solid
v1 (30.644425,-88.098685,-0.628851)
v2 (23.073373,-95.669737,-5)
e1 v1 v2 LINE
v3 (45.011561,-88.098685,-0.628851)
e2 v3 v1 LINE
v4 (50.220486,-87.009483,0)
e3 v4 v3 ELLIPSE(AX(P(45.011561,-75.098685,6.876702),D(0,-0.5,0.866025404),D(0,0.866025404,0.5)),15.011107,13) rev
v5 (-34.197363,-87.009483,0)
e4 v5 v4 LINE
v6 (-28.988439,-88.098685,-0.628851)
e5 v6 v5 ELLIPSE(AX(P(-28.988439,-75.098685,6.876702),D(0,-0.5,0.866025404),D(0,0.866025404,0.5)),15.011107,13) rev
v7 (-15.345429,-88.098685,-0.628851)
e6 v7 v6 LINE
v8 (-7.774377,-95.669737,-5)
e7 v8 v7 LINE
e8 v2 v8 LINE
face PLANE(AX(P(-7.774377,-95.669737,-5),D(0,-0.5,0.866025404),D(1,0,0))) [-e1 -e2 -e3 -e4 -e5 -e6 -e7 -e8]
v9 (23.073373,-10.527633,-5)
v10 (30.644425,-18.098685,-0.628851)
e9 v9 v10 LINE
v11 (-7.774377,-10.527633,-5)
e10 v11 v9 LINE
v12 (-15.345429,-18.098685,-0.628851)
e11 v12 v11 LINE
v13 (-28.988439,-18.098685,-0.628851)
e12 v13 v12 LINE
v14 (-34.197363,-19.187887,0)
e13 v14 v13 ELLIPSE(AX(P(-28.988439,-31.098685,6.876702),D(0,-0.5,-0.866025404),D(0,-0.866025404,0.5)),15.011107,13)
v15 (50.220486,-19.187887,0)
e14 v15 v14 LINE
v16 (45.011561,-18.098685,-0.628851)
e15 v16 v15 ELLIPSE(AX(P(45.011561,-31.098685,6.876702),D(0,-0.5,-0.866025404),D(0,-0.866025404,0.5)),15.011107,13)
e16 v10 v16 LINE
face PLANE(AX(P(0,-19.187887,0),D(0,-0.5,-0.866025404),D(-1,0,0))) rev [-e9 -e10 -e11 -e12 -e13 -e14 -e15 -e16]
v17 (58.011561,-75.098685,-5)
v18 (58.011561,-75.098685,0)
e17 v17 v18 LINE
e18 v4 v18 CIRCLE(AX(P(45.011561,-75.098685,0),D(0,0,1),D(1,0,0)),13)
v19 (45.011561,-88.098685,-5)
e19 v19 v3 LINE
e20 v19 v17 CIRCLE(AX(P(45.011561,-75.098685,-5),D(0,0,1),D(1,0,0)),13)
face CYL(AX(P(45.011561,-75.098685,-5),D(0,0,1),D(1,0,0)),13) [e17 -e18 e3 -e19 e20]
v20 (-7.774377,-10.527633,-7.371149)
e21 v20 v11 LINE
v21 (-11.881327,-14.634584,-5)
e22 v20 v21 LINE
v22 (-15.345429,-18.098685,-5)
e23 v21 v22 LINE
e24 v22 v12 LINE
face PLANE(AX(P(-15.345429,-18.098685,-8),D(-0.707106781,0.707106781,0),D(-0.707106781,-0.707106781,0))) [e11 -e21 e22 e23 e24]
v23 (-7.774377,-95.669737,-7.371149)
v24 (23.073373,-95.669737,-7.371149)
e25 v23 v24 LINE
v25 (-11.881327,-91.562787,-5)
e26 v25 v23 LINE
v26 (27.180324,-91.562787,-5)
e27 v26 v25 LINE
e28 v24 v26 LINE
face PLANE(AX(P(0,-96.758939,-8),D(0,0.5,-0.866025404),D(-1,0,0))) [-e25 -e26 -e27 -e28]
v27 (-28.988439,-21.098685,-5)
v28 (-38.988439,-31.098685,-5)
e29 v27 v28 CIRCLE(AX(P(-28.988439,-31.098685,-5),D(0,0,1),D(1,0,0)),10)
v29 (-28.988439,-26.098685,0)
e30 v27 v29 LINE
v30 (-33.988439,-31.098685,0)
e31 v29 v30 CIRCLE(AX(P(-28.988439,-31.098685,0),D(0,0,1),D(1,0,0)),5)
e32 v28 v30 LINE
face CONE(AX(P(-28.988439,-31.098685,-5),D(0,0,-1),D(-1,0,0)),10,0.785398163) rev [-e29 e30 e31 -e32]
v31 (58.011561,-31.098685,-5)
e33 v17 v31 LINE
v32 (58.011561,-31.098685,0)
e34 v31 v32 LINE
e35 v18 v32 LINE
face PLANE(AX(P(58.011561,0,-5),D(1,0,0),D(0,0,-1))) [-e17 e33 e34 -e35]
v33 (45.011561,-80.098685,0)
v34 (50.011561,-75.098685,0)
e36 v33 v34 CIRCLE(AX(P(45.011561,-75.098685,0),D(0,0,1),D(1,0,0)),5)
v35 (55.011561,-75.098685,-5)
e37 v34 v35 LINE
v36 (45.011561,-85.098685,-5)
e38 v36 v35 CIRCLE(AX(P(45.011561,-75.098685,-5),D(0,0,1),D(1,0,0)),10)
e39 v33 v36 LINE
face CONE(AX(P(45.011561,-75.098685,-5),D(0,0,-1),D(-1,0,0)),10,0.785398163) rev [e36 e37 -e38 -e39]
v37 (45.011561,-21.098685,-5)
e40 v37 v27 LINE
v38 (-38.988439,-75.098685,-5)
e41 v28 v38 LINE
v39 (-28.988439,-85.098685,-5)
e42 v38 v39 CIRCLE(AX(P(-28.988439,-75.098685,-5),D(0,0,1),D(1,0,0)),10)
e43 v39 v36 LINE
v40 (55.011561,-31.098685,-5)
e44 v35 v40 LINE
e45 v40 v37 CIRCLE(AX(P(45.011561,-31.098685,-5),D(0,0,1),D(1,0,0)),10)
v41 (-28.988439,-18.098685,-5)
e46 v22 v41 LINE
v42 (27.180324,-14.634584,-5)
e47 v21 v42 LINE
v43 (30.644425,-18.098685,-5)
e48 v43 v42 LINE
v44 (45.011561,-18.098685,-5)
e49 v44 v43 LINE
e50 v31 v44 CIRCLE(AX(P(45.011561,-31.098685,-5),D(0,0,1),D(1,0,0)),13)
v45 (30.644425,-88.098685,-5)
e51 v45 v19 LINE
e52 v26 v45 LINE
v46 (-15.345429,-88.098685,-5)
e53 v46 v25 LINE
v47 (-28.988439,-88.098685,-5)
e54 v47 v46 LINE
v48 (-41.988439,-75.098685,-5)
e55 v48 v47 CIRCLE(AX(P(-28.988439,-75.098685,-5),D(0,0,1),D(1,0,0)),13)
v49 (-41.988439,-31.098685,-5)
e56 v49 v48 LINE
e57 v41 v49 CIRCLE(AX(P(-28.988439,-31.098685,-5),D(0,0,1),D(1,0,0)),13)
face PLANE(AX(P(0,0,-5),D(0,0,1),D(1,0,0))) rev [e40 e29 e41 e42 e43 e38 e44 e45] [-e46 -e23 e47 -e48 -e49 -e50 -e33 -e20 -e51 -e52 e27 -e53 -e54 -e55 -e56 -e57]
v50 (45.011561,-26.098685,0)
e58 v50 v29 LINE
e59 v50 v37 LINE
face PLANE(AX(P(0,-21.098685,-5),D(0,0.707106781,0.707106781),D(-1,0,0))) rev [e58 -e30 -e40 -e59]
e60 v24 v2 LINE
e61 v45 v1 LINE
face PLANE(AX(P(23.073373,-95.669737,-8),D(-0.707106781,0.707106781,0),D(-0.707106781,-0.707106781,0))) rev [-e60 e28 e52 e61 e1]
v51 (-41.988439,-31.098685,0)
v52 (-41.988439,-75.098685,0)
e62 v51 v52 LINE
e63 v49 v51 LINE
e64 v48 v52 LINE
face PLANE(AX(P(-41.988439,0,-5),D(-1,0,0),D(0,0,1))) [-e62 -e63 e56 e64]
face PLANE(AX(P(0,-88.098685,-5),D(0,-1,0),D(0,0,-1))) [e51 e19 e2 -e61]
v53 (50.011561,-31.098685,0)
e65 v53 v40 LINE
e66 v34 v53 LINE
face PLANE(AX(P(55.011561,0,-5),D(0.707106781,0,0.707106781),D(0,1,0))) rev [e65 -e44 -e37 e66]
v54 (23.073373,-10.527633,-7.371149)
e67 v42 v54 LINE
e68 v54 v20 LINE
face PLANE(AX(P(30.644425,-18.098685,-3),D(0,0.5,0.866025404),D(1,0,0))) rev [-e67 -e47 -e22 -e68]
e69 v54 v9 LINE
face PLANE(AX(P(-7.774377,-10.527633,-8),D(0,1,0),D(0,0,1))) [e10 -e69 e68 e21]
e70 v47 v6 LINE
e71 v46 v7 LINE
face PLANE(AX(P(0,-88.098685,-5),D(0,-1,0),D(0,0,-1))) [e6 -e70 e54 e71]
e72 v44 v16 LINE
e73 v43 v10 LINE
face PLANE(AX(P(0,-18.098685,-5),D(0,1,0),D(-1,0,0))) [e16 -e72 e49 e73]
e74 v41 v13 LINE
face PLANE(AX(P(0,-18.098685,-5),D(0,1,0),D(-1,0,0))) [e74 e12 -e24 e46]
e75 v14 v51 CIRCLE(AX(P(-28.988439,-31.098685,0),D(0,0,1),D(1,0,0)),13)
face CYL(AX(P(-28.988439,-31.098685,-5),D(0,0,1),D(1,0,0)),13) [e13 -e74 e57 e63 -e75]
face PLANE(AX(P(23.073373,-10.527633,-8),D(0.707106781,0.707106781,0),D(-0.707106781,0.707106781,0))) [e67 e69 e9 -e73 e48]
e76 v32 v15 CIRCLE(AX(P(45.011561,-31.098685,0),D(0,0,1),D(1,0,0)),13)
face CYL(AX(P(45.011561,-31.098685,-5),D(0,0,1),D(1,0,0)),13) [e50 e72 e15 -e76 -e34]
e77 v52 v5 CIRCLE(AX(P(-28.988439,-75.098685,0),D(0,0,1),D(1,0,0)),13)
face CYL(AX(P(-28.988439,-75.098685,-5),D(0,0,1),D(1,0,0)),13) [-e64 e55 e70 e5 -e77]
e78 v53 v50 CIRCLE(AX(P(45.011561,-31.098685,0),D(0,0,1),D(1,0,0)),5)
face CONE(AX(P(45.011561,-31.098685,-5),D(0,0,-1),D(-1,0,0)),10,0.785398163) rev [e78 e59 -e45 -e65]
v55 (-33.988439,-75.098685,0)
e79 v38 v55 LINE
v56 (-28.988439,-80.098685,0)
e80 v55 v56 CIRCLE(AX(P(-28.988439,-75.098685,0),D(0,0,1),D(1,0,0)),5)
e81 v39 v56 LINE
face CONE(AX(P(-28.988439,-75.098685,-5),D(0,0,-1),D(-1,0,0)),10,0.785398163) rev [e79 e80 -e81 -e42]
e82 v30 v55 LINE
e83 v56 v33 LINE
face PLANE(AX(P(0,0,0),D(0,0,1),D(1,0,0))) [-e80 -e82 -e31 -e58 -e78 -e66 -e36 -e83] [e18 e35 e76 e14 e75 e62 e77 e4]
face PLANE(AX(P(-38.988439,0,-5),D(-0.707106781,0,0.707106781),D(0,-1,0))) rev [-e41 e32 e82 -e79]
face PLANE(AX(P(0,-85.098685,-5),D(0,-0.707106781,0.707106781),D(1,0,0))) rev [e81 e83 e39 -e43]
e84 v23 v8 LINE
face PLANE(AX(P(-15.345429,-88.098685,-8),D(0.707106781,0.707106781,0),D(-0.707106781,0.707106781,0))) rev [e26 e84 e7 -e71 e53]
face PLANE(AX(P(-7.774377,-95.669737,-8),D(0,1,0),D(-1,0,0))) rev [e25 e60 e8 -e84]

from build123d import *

# Parameters (mm, degrees)
BOSS_EXTRUDE1_DEPTH       = 5
CHAMFER1_SIZE             = 5
BOSS_EXTRUDE2_DEPTH       = 8
CHAMFER2_SIZE2            = 5
CHAMFER2_SIZE             = 8.660254038
CHAMFER2_OF_MIRROR1_SIZE2 = 5
CHAMFER2_OF_MIRROR1_SIZE  = 8.660254038


# Some blends are built 0.0001 mm under size
with BuildPart() as part:
    # Sketch1 → Boss-Extrude1 (new body)
    # profile 1 of 2: a face of its own
    with BuildSketch(Plane.XY):
        with BuildLine():
            Line((-41.988438617, -31.098685124), (-41.988438617, -75.098685124))
            ThreePointArc((-41.988438617, -75.098685124), (-38.180826772, -84.291073279), (-28.988438617, -88.098685124))
            Line((-28.988438617, -88.098685124), (45.011561383, -88.098685124))
            ThreePointArc((45.011561383, -88.098685124), (54.203949538, -84.291073279), (58.011561383, -75.098685124))
            Line((58.011561383, -75.098685124), (58.011561383, -31.098685124))
            ThreePointArc((58.011561383, -31.098685124), (54.203949538, -21.906296968), (45.011561383, -18.098685124))
            Line((45.011561383, -18.098685124), (-28.988438617, -18.098685124))
            ThreePointArc((-28.988438617, -18.098685124), (-38.180826772, -21.906296968), (-41.988438617, -31.098685124))
        make_face()
        with BuildLine():
            ThreePointArc((-38.988438617, -75.098685124), (-36.059506429, -82.169752935), (-28.988438617, -85.098685124))
            Line((-28.988438617, -85.098685124), (45.011561383, -85.098685124))
            ThreePointArc((45.011561383, -85.098685124), (52.082629195, -82.169752935), (55.011561383, -75.098685124))
            Line((55.011561383, -75.098685124), (55.011561383, -31.098685124))
            ThreePointArc((55.011561383, -31.098685124), (52.082629195, -24.027617312), (45.011561383, -21.098685124))
            Line((45.011561383, -21.098685124), (-28.988438617, -21.098685124))
            ThreePointArc((-28.988438617, -21.098685124), (-36.059506429, -24.027617312), (-38.988438617, -31.098685124))
            Line((-38.988438617, -31.098685124), (-38.988438617, -75.098685124))
        make_face(mode=Mode.SUBTRACT)
    # profile 2 of 2: a face of its own
    with BuildSketch(Plane.XY):
        with BuildLine():
            Line((-38.988438617, -31.098685124), (-38.988438617, -75.098685124))
            ThreePointArc((-38.988438617, -75.098685124), (-36.059506429, -82.169752935), (-28.988438617, -85.098685124))
            Line((-28.988438617, -85.098685124), (45.011561383, -85.098685124))
            ThreePointArc((45.011561383, -85.098685124), (52.082629195, -82.169752935), (55.011561383, -75.098685124))
            Line((55.011561383, -75.098685124), (55.011561383, -31.098685124))
            ThreePointArc((55.011561383, -31.098685124), (52.082629195, -24.027617312), (45.011561383, -21.098685124))
            Line((45.011561383, -21.098685124), (-28.988438617, -21.098685124))
            ThreePointArc((-28.988438617, -21.098685124), (-36.059506429, -24.027617312), (-38.988438617, -31.098685124))
        make_face()
        with BuildLine():
            ThreePointArc((-33.988438617, -75.098685124), (-32.523972523, -78.63421903), (-28.988438617, -80.098685124))
            Line((-28.988438617, -80.098685124), (45.011561383, -80.098685124))
            ThreePointArc((45.011561383, -80.098685124), (48.547095289, -78.63421903), (50.011561383, -75.098685124))
            Line((50.011561383, -75.098685124), (50.011561383, -31.098685124))
            ThreePointArc((50.011561383, -31.098685124), (48.547095289, -27.563151218), (45.011561383, -26.098685124))
            Line((45.011561383, -26.098685124), (-28.988438617, -26.098685124))
            ThreePointArc((-28.988438617, -26.098685124), (-32.523972523, -27.563151218), (-33.988438617, -31.098685124))
            Line((-33.988438617, -31.098685124), (-33.988438617, -75.098685124))
        make_face(mode=Mode.SUBTRACT)
    extrude(amount=-BOSS_EXTRUDE1_DEPTH)

    # Chamfer1
    chamfer1_edges = [part.edges().sort_by_distance(p)[0] for p in [
        (8.011561383, -80.098685124, -5),
        (48.547095289, -78.63421903, -5),
        (-32.523972523, -78.63421903, -5),
        (50.011561383, -53.098685124, -5),
        (-33.988438617, -53.098685124, -5),
        (48.547095289, -27.563151218, -5),
        (-32.523972523, -27.563151218, -5),
        (8.011561383, -26.098685124, -5),
    ]]
    chamfer(chamfer1_edges, length=CHAMFER1_SIZE - 0.0001)  # a hair under: the kernel refuses the full size

    # Sketch2 → Boss-Extrude2 (add)
    with BuildSketch(Plane.XY):
        Polygon((-15.345428916, -18.098685124), (-7.774377041, -10.527633249), (23.073373404, -10.527633249), (30.644425279, -18.098685124), align=None)
    boss_extrude2 = extrude(amount=-BOSS_EXTRUDE2_DEPTH)

    # Chamfer2
    chamfer2_edges = [part.edges().sort_by_distance(p)[0] for p in [
        (7.649498182, -10.527633249, 0),
    ]]
    chamfer2_side = [part.faces().sort_by_distance(p)[0] for p in [
        (7.649498182, -10.627633249, 0),
    ]]
    chamfer(chamfer2_edges, length=CHAMFER2_SIZE, length2=CHAMFER2_SIZE2, reference=chamfer2_side[0])
    # the kernel refuses this chamfer: 8.660254038, 5 mm, written as the material it takes off along each edge
    with BuildSketch(Plane(origin=(53.049245132, -18.098685124, -8), x_dir=(0, -0.05789386240267115, 0.9983227437537926), z_dir=(-1, 0, 0))) as chamfer2_2_piece_1_section:
        with BuildLine():
            Line((5.181896449, 0), (-0.691658286, 8.935197885))
            Line((-0.691658286, 8.935197885), (-0.864572857, 8.925170374))
            ThreePointArc((-0.864572857, 8.925170374), (-0.432286429, 4.462585187), (-0.172914571, -0.010027511))
            Line((-0.172914571, -0.010027511), (0.010027511, -0.172914571))
            ThreePointArc((0.010027511, -0.172914571), (2.592291656, -0.02316616), (5.19192396, -0.172914571))
            Line((5.19192396, -0.172914571), (5.181896449, 0))
        make_face()
    chamfer2_2_piece_1 = extrude(amount=90.7994939, mode=Mode.PRIVATE)
    chamfer2_2_piece_1 = split(chamfer2_2_piece_1, bisect_by=Plane(origin=(7.649498182, -14.797310686, -5), z_dir=(0, 0, -1)), keep=Keep.TOP, mode=Mode.PRIVATE)
    add(chamfer2_2_piece_1, mode=Mode.SUBTRACT)

    # Mirror1: Boss-Extrude2 across plane
    add(boss_extrude2.mirror(Plane.ZX.offset(-53.098685124)))

    # Chamfer2 of Mirror1
    chamfer2_of_mirror1_edges = [part.edges().sort_by_distance(p)[0] for p in [
        (7.649498182, -95.669736998, 0),
    ]]
    chamfer2_of_mirror1_side = [part.faces().sort_by_distance(p)[0] for p in [
        (7.649498182, -95.569736998, 0),
    ]]
    chamfer(chamfer2_of_mirror1_edges, length=CHAMFER2_OF_MIRROR1_SIZE, length2=CHAMFER2_OF_MIRROR1_SIZE2, reference=chamfer2_of_mirror1_side[0])
    # the kernel refuses this chamfer: 8.660254038, 5 mm, written as the material it takes off along each edge
    with BuildSketch(Plane(origin=(53.049245132, -88.098685124, -8), x_dir=(0, 0.057893862402670464, 0.9983227437537926), z_dir=(-1, 0, 0))) as chamfer2_of_mirror1_2_piece_1_section:
        with BuildLine():
            Line((5.181896449, 0), (-0.691658286, -8.935197885))
            Line((-0.691658286, -8.935197885), (-0.864572857, -8.925170374))
            ThreePointArc((-0.864572857, -8.925170374), (-0.432286429, -4.462585187), (-0.172914571, 0.010027511))
            Line((-0.172914571, 0.010027511), (0.010027511, 0.172914571))
            ThreePointArc((0.010027511, 0.172914571), (2.592291656, 0.02316616), (5.19192396, 0.172914571))
            Line((5.19192396, 0.172914571), (5.181896449, 0))
        make_face()
    chamfer2_of_mirror1_2_piece_1 = extrude(amount=90.7994939, mode=Mode.PRIVATE)
    chamfer2_of_mirror1_2_piece_1 = split(chamfer2_of_mirror1_2_piece_1, bisect_by=Plane(origin=(7.649498182, -91.400059561, -5), z_dir=(0, 0, -1)), keep=Keep.TOP, mode=Mode.PRIVATE)
    add(chamfer2_of_mirror1_2_piece_1, mode=Mode.SUBTRACT)


solid = part.part
